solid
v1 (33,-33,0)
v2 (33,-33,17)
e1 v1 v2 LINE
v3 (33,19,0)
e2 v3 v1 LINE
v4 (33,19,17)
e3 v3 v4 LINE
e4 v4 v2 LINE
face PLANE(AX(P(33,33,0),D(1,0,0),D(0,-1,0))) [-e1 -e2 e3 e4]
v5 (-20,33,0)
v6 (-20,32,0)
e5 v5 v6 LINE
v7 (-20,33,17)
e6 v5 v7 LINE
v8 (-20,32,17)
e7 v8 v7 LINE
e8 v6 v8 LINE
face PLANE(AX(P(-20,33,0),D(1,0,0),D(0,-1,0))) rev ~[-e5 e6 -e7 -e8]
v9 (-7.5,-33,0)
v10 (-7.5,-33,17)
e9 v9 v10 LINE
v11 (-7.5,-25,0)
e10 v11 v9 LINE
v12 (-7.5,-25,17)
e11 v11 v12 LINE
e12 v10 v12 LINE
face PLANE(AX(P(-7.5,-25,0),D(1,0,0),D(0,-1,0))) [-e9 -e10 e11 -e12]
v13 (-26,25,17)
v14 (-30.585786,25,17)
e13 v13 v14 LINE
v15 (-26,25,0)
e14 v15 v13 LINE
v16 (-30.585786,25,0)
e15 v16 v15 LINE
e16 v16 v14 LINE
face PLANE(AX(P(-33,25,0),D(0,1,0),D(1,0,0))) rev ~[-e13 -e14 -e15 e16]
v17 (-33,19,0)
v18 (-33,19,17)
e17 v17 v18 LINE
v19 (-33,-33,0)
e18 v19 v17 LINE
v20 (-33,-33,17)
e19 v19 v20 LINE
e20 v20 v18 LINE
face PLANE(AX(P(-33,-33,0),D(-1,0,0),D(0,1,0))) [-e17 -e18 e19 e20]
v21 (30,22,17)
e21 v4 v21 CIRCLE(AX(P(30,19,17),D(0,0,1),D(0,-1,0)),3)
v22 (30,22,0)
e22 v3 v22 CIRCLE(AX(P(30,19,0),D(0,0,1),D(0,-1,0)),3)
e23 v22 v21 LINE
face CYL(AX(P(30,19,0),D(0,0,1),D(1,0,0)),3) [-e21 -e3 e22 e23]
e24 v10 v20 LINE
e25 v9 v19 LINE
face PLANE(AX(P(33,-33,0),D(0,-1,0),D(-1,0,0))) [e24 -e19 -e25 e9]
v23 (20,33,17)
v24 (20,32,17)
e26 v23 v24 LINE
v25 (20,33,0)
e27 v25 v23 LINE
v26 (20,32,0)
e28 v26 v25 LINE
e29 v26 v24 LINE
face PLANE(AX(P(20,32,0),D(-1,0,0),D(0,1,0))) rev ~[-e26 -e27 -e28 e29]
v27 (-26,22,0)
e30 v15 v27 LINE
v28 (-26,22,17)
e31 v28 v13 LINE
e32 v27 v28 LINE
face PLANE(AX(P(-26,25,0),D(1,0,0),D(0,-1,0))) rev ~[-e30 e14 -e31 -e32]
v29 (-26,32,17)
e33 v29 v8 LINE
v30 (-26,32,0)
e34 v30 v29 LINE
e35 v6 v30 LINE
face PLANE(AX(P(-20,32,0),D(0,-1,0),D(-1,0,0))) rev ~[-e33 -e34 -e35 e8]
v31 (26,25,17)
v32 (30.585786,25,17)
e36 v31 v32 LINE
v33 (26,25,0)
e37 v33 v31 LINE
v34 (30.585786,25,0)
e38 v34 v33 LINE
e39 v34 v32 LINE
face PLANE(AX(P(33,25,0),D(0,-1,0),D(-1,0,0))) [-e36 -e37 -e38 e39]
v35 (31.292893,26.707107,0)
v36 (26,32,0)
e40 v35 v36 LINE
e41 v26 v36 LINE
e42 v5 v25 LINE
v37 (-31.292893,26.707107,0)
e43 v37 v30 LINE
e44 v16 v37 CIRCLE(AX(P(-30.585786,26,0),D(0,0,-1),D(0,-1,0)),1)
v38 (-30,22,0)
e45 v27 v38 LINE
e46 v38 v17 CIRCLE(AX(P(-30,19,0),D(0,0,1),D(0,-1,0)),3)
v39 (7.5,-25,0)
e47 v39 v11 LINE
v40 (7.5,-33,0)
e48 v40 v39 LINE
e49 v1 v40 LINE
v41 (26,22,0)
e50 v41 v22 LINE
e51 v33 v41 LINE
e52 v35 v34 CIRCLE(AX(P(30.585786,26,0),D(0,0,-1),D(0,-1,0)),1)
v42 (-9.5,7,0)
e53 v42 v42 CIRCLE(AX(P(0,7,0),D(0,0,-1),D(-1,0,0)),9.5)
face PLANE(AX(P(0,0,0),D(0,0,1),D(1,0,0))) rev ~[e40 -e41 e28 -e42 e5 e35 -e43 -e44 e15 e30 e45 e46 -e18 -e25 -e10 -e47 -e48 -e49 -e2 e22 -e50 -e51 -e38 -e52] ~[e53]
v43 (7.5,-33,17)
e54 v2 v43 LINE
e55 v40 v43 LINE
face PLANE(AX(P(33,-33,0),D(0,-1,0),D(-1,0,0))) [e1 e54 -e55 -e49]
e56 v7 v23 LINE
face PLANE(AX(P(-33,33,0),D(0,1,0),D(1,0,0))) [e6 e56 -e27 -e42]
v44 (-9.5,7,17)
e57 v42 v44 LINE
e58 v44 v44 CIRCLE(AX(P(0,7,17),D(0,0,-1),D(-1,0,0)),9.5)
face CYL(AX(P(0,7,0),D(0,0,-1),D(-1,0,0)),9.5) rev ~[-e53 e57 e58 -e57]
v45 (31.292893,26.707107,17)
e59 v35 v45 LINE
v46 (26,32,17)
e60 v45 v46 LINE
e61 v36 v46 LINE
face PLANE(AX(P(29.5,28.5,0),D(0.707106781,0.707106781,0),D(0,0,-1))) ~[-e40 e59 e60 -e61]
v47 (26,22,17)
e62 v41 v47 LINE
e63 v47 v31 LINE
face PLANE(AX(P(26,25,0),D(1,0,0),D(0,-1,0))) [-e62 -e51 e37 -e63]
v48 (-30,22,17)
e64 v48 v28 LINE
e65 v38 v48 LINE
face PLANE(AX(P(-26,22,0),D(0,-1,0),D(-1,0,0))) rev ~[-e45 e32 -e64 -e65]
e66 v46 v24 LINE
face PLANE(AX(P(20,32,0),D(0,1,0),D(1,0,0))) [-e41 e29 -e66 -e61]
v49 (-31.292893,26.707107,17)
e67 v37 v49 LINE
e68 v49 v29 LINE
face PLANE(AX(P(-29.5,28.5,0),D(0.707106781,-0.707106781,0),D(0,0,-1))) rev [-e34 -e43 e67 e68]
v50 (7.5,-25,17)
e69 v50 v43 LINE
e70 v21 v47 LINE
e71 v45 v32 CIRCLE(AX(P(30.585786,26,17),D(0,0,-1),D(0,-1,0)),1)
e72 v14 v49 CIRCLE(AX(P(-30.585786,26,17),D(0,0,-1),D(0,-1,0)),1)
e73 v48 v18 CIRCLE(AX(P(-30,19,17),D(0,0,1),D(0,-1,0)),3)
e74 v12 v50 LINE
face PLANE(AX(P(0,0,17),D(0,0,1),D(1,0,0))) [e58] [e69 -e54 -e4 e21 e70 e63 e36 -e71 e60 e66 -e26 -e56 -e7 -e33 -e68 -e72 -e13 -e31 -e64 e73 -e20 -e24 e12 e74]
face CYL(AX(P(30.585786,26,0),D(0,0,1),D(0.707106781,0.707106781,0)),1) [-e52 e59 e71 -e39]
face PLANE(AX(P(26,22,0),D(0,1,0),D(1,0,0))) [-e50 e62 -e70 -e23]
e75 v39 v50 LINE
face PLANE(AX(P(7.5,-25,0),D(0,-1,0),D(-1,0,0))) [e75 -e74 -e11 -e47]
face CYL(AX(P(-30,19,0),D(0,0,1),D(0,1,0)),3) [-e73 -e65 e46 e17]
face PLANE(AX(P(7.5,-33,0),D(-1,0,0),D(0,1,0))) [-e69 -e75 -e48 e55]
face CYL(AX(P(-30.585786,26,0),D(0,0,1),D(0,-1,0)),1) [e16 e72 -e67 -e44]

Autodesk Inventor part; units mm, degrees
ref_plane "YZ Plane" through (0, 0, 0) normal (1, 0, 0) x (0, 1, 0)
ref_plane "XZ Plane" through (0, 0, 0) normal (0, 1, 0) x (-1, 0, 0)
ref_plane "XY Plane" through (0, 0, 0) normal (0, 0, 1) x (1, 0, 0)
sketch "Sketch2" plane through (0, 0, 0) normal (0, 0, 1) x (1, 0, 0)
  line L0 (33, -33) -> (-33, -33)
  line L1 (-33, -33) -> (-33, 33)
  line L2 (-33, 33) -> (33, 33)
  line L3 (33, 33) -> (33, -33)
  line L4 (0, 0) -> (0, 20.7499)
  line L5 (0, 0) -> (18.2964, 0)
  point P0 (0, 33)
  point P1 (33, 0)
  dimension "d17" = 66
  dimension "d18" = 66
extrude "Extrusion1" add sketch "Sketch2" along normal blind 17
sketch "Sketch3" plane through (0, 0, 0) normal (0, 0, -1) x (-1, 0, 0)
  line L0 (33, -33) -> (33, 33) projected
  line L1 (33, 33) -> (-33, 33) projected
  line L2 (-33, 33) -> (-33, -33) projected
  line L3 (20, 32) -> (-20, 32)
  line L4 (-20, 32) -> (-20, 33)
  line L5 (-20, 33) -> (20, 33)
  line L6 (20, 33) -> (20, 32)
  line L7 (-20, 32) -> (-33, 32)
  line L8 (20, 32) -> (33, 32)
  point P0 (0, 0)
  point P1 (0, 33)
  dimension "d21" = 40
  dimension "d22" = 1
extrude "Extrusion2" cut sketch "Sketch3" against normal through all contours L8 L6 L1 L0 | L7 L2 L1 L4
chamfer "Chamfer1" distance 7 angle 45 2 edges at (33, 32, 8.5) (-33, 32, 8.5)
sketch "Sketch4" plane through (0, 0, 0) normal (0, 0, -1) x (-1, 0, 0)
  line L0 (-33, 25) -> (-33, -33) projected
  line L1 (33, -33) -> (33, 25) projected
  line L2 (33, 25) -> (26, 25)
  line L3 (26, 25) -> (26, 22)
  line L4 (26, 22) -> (33, 22)
  line L5 (-33, 25) -> (-26, 25)
  line L6 (-26, 25) -> (-26, 22)
  line L7 (-26, 22) -> (-33, 22)
  point P0 (0, 0)
  dimension "d28" = 7
  dimension "d29" = 3
  dimension "d30" = 7
  dimension "d31" = 3
extrude "Extrusion3" cut sketch "Sketch4" against normal through all
fillet "Fillet1" radius 1 2 edges at (-33, 25, 8.5) (33, 25, 8.5)
fillet "Fillet2" radius 3 2 edges at (33, 22, 8.5) (-33, 22, 8.5)
sketch "Sketch5" plane through (0, 0, 0) normal (0, 0, -1) x (-1, 0, 0)
  line L0 (-33, -33) -> (33, -33) projected
  line L1 (7.5, -33) -> (-7.5, -33)
  line L2 (-7.5, -33) -> (-7.5, -25)
  line L3 (-7.5, -25) -> (7.5, -25)
  line L4 (7.5, -25) -> (7.5, -33)
  point P0 (0, 0)
  point P1 (0, -33)
  dimension "d36" = 15
  dimension "d37" = 8
extrude "Extrusion4" cut sketch "Sketch5" against normal through all
sketch "Sketch6" plane through (0, 0, 0) normal (0, 0, -1) x (-1, 0, 0)
  line L0 (33, -33) -> (33, 19) projected
  line L1 (20, 33) -> (-20, 33) projected
  circle A0 centre (0, 7) radius 9.5
  point P0 (0, 0)
  dimension "d40" = 19
  dimension "d41" = 26
  dimension "d42" = 33
extrude "Extrusion5" cut sketch "Sketch6" against normal through all
properties part number "Holder" material "Steel, Carbon"
